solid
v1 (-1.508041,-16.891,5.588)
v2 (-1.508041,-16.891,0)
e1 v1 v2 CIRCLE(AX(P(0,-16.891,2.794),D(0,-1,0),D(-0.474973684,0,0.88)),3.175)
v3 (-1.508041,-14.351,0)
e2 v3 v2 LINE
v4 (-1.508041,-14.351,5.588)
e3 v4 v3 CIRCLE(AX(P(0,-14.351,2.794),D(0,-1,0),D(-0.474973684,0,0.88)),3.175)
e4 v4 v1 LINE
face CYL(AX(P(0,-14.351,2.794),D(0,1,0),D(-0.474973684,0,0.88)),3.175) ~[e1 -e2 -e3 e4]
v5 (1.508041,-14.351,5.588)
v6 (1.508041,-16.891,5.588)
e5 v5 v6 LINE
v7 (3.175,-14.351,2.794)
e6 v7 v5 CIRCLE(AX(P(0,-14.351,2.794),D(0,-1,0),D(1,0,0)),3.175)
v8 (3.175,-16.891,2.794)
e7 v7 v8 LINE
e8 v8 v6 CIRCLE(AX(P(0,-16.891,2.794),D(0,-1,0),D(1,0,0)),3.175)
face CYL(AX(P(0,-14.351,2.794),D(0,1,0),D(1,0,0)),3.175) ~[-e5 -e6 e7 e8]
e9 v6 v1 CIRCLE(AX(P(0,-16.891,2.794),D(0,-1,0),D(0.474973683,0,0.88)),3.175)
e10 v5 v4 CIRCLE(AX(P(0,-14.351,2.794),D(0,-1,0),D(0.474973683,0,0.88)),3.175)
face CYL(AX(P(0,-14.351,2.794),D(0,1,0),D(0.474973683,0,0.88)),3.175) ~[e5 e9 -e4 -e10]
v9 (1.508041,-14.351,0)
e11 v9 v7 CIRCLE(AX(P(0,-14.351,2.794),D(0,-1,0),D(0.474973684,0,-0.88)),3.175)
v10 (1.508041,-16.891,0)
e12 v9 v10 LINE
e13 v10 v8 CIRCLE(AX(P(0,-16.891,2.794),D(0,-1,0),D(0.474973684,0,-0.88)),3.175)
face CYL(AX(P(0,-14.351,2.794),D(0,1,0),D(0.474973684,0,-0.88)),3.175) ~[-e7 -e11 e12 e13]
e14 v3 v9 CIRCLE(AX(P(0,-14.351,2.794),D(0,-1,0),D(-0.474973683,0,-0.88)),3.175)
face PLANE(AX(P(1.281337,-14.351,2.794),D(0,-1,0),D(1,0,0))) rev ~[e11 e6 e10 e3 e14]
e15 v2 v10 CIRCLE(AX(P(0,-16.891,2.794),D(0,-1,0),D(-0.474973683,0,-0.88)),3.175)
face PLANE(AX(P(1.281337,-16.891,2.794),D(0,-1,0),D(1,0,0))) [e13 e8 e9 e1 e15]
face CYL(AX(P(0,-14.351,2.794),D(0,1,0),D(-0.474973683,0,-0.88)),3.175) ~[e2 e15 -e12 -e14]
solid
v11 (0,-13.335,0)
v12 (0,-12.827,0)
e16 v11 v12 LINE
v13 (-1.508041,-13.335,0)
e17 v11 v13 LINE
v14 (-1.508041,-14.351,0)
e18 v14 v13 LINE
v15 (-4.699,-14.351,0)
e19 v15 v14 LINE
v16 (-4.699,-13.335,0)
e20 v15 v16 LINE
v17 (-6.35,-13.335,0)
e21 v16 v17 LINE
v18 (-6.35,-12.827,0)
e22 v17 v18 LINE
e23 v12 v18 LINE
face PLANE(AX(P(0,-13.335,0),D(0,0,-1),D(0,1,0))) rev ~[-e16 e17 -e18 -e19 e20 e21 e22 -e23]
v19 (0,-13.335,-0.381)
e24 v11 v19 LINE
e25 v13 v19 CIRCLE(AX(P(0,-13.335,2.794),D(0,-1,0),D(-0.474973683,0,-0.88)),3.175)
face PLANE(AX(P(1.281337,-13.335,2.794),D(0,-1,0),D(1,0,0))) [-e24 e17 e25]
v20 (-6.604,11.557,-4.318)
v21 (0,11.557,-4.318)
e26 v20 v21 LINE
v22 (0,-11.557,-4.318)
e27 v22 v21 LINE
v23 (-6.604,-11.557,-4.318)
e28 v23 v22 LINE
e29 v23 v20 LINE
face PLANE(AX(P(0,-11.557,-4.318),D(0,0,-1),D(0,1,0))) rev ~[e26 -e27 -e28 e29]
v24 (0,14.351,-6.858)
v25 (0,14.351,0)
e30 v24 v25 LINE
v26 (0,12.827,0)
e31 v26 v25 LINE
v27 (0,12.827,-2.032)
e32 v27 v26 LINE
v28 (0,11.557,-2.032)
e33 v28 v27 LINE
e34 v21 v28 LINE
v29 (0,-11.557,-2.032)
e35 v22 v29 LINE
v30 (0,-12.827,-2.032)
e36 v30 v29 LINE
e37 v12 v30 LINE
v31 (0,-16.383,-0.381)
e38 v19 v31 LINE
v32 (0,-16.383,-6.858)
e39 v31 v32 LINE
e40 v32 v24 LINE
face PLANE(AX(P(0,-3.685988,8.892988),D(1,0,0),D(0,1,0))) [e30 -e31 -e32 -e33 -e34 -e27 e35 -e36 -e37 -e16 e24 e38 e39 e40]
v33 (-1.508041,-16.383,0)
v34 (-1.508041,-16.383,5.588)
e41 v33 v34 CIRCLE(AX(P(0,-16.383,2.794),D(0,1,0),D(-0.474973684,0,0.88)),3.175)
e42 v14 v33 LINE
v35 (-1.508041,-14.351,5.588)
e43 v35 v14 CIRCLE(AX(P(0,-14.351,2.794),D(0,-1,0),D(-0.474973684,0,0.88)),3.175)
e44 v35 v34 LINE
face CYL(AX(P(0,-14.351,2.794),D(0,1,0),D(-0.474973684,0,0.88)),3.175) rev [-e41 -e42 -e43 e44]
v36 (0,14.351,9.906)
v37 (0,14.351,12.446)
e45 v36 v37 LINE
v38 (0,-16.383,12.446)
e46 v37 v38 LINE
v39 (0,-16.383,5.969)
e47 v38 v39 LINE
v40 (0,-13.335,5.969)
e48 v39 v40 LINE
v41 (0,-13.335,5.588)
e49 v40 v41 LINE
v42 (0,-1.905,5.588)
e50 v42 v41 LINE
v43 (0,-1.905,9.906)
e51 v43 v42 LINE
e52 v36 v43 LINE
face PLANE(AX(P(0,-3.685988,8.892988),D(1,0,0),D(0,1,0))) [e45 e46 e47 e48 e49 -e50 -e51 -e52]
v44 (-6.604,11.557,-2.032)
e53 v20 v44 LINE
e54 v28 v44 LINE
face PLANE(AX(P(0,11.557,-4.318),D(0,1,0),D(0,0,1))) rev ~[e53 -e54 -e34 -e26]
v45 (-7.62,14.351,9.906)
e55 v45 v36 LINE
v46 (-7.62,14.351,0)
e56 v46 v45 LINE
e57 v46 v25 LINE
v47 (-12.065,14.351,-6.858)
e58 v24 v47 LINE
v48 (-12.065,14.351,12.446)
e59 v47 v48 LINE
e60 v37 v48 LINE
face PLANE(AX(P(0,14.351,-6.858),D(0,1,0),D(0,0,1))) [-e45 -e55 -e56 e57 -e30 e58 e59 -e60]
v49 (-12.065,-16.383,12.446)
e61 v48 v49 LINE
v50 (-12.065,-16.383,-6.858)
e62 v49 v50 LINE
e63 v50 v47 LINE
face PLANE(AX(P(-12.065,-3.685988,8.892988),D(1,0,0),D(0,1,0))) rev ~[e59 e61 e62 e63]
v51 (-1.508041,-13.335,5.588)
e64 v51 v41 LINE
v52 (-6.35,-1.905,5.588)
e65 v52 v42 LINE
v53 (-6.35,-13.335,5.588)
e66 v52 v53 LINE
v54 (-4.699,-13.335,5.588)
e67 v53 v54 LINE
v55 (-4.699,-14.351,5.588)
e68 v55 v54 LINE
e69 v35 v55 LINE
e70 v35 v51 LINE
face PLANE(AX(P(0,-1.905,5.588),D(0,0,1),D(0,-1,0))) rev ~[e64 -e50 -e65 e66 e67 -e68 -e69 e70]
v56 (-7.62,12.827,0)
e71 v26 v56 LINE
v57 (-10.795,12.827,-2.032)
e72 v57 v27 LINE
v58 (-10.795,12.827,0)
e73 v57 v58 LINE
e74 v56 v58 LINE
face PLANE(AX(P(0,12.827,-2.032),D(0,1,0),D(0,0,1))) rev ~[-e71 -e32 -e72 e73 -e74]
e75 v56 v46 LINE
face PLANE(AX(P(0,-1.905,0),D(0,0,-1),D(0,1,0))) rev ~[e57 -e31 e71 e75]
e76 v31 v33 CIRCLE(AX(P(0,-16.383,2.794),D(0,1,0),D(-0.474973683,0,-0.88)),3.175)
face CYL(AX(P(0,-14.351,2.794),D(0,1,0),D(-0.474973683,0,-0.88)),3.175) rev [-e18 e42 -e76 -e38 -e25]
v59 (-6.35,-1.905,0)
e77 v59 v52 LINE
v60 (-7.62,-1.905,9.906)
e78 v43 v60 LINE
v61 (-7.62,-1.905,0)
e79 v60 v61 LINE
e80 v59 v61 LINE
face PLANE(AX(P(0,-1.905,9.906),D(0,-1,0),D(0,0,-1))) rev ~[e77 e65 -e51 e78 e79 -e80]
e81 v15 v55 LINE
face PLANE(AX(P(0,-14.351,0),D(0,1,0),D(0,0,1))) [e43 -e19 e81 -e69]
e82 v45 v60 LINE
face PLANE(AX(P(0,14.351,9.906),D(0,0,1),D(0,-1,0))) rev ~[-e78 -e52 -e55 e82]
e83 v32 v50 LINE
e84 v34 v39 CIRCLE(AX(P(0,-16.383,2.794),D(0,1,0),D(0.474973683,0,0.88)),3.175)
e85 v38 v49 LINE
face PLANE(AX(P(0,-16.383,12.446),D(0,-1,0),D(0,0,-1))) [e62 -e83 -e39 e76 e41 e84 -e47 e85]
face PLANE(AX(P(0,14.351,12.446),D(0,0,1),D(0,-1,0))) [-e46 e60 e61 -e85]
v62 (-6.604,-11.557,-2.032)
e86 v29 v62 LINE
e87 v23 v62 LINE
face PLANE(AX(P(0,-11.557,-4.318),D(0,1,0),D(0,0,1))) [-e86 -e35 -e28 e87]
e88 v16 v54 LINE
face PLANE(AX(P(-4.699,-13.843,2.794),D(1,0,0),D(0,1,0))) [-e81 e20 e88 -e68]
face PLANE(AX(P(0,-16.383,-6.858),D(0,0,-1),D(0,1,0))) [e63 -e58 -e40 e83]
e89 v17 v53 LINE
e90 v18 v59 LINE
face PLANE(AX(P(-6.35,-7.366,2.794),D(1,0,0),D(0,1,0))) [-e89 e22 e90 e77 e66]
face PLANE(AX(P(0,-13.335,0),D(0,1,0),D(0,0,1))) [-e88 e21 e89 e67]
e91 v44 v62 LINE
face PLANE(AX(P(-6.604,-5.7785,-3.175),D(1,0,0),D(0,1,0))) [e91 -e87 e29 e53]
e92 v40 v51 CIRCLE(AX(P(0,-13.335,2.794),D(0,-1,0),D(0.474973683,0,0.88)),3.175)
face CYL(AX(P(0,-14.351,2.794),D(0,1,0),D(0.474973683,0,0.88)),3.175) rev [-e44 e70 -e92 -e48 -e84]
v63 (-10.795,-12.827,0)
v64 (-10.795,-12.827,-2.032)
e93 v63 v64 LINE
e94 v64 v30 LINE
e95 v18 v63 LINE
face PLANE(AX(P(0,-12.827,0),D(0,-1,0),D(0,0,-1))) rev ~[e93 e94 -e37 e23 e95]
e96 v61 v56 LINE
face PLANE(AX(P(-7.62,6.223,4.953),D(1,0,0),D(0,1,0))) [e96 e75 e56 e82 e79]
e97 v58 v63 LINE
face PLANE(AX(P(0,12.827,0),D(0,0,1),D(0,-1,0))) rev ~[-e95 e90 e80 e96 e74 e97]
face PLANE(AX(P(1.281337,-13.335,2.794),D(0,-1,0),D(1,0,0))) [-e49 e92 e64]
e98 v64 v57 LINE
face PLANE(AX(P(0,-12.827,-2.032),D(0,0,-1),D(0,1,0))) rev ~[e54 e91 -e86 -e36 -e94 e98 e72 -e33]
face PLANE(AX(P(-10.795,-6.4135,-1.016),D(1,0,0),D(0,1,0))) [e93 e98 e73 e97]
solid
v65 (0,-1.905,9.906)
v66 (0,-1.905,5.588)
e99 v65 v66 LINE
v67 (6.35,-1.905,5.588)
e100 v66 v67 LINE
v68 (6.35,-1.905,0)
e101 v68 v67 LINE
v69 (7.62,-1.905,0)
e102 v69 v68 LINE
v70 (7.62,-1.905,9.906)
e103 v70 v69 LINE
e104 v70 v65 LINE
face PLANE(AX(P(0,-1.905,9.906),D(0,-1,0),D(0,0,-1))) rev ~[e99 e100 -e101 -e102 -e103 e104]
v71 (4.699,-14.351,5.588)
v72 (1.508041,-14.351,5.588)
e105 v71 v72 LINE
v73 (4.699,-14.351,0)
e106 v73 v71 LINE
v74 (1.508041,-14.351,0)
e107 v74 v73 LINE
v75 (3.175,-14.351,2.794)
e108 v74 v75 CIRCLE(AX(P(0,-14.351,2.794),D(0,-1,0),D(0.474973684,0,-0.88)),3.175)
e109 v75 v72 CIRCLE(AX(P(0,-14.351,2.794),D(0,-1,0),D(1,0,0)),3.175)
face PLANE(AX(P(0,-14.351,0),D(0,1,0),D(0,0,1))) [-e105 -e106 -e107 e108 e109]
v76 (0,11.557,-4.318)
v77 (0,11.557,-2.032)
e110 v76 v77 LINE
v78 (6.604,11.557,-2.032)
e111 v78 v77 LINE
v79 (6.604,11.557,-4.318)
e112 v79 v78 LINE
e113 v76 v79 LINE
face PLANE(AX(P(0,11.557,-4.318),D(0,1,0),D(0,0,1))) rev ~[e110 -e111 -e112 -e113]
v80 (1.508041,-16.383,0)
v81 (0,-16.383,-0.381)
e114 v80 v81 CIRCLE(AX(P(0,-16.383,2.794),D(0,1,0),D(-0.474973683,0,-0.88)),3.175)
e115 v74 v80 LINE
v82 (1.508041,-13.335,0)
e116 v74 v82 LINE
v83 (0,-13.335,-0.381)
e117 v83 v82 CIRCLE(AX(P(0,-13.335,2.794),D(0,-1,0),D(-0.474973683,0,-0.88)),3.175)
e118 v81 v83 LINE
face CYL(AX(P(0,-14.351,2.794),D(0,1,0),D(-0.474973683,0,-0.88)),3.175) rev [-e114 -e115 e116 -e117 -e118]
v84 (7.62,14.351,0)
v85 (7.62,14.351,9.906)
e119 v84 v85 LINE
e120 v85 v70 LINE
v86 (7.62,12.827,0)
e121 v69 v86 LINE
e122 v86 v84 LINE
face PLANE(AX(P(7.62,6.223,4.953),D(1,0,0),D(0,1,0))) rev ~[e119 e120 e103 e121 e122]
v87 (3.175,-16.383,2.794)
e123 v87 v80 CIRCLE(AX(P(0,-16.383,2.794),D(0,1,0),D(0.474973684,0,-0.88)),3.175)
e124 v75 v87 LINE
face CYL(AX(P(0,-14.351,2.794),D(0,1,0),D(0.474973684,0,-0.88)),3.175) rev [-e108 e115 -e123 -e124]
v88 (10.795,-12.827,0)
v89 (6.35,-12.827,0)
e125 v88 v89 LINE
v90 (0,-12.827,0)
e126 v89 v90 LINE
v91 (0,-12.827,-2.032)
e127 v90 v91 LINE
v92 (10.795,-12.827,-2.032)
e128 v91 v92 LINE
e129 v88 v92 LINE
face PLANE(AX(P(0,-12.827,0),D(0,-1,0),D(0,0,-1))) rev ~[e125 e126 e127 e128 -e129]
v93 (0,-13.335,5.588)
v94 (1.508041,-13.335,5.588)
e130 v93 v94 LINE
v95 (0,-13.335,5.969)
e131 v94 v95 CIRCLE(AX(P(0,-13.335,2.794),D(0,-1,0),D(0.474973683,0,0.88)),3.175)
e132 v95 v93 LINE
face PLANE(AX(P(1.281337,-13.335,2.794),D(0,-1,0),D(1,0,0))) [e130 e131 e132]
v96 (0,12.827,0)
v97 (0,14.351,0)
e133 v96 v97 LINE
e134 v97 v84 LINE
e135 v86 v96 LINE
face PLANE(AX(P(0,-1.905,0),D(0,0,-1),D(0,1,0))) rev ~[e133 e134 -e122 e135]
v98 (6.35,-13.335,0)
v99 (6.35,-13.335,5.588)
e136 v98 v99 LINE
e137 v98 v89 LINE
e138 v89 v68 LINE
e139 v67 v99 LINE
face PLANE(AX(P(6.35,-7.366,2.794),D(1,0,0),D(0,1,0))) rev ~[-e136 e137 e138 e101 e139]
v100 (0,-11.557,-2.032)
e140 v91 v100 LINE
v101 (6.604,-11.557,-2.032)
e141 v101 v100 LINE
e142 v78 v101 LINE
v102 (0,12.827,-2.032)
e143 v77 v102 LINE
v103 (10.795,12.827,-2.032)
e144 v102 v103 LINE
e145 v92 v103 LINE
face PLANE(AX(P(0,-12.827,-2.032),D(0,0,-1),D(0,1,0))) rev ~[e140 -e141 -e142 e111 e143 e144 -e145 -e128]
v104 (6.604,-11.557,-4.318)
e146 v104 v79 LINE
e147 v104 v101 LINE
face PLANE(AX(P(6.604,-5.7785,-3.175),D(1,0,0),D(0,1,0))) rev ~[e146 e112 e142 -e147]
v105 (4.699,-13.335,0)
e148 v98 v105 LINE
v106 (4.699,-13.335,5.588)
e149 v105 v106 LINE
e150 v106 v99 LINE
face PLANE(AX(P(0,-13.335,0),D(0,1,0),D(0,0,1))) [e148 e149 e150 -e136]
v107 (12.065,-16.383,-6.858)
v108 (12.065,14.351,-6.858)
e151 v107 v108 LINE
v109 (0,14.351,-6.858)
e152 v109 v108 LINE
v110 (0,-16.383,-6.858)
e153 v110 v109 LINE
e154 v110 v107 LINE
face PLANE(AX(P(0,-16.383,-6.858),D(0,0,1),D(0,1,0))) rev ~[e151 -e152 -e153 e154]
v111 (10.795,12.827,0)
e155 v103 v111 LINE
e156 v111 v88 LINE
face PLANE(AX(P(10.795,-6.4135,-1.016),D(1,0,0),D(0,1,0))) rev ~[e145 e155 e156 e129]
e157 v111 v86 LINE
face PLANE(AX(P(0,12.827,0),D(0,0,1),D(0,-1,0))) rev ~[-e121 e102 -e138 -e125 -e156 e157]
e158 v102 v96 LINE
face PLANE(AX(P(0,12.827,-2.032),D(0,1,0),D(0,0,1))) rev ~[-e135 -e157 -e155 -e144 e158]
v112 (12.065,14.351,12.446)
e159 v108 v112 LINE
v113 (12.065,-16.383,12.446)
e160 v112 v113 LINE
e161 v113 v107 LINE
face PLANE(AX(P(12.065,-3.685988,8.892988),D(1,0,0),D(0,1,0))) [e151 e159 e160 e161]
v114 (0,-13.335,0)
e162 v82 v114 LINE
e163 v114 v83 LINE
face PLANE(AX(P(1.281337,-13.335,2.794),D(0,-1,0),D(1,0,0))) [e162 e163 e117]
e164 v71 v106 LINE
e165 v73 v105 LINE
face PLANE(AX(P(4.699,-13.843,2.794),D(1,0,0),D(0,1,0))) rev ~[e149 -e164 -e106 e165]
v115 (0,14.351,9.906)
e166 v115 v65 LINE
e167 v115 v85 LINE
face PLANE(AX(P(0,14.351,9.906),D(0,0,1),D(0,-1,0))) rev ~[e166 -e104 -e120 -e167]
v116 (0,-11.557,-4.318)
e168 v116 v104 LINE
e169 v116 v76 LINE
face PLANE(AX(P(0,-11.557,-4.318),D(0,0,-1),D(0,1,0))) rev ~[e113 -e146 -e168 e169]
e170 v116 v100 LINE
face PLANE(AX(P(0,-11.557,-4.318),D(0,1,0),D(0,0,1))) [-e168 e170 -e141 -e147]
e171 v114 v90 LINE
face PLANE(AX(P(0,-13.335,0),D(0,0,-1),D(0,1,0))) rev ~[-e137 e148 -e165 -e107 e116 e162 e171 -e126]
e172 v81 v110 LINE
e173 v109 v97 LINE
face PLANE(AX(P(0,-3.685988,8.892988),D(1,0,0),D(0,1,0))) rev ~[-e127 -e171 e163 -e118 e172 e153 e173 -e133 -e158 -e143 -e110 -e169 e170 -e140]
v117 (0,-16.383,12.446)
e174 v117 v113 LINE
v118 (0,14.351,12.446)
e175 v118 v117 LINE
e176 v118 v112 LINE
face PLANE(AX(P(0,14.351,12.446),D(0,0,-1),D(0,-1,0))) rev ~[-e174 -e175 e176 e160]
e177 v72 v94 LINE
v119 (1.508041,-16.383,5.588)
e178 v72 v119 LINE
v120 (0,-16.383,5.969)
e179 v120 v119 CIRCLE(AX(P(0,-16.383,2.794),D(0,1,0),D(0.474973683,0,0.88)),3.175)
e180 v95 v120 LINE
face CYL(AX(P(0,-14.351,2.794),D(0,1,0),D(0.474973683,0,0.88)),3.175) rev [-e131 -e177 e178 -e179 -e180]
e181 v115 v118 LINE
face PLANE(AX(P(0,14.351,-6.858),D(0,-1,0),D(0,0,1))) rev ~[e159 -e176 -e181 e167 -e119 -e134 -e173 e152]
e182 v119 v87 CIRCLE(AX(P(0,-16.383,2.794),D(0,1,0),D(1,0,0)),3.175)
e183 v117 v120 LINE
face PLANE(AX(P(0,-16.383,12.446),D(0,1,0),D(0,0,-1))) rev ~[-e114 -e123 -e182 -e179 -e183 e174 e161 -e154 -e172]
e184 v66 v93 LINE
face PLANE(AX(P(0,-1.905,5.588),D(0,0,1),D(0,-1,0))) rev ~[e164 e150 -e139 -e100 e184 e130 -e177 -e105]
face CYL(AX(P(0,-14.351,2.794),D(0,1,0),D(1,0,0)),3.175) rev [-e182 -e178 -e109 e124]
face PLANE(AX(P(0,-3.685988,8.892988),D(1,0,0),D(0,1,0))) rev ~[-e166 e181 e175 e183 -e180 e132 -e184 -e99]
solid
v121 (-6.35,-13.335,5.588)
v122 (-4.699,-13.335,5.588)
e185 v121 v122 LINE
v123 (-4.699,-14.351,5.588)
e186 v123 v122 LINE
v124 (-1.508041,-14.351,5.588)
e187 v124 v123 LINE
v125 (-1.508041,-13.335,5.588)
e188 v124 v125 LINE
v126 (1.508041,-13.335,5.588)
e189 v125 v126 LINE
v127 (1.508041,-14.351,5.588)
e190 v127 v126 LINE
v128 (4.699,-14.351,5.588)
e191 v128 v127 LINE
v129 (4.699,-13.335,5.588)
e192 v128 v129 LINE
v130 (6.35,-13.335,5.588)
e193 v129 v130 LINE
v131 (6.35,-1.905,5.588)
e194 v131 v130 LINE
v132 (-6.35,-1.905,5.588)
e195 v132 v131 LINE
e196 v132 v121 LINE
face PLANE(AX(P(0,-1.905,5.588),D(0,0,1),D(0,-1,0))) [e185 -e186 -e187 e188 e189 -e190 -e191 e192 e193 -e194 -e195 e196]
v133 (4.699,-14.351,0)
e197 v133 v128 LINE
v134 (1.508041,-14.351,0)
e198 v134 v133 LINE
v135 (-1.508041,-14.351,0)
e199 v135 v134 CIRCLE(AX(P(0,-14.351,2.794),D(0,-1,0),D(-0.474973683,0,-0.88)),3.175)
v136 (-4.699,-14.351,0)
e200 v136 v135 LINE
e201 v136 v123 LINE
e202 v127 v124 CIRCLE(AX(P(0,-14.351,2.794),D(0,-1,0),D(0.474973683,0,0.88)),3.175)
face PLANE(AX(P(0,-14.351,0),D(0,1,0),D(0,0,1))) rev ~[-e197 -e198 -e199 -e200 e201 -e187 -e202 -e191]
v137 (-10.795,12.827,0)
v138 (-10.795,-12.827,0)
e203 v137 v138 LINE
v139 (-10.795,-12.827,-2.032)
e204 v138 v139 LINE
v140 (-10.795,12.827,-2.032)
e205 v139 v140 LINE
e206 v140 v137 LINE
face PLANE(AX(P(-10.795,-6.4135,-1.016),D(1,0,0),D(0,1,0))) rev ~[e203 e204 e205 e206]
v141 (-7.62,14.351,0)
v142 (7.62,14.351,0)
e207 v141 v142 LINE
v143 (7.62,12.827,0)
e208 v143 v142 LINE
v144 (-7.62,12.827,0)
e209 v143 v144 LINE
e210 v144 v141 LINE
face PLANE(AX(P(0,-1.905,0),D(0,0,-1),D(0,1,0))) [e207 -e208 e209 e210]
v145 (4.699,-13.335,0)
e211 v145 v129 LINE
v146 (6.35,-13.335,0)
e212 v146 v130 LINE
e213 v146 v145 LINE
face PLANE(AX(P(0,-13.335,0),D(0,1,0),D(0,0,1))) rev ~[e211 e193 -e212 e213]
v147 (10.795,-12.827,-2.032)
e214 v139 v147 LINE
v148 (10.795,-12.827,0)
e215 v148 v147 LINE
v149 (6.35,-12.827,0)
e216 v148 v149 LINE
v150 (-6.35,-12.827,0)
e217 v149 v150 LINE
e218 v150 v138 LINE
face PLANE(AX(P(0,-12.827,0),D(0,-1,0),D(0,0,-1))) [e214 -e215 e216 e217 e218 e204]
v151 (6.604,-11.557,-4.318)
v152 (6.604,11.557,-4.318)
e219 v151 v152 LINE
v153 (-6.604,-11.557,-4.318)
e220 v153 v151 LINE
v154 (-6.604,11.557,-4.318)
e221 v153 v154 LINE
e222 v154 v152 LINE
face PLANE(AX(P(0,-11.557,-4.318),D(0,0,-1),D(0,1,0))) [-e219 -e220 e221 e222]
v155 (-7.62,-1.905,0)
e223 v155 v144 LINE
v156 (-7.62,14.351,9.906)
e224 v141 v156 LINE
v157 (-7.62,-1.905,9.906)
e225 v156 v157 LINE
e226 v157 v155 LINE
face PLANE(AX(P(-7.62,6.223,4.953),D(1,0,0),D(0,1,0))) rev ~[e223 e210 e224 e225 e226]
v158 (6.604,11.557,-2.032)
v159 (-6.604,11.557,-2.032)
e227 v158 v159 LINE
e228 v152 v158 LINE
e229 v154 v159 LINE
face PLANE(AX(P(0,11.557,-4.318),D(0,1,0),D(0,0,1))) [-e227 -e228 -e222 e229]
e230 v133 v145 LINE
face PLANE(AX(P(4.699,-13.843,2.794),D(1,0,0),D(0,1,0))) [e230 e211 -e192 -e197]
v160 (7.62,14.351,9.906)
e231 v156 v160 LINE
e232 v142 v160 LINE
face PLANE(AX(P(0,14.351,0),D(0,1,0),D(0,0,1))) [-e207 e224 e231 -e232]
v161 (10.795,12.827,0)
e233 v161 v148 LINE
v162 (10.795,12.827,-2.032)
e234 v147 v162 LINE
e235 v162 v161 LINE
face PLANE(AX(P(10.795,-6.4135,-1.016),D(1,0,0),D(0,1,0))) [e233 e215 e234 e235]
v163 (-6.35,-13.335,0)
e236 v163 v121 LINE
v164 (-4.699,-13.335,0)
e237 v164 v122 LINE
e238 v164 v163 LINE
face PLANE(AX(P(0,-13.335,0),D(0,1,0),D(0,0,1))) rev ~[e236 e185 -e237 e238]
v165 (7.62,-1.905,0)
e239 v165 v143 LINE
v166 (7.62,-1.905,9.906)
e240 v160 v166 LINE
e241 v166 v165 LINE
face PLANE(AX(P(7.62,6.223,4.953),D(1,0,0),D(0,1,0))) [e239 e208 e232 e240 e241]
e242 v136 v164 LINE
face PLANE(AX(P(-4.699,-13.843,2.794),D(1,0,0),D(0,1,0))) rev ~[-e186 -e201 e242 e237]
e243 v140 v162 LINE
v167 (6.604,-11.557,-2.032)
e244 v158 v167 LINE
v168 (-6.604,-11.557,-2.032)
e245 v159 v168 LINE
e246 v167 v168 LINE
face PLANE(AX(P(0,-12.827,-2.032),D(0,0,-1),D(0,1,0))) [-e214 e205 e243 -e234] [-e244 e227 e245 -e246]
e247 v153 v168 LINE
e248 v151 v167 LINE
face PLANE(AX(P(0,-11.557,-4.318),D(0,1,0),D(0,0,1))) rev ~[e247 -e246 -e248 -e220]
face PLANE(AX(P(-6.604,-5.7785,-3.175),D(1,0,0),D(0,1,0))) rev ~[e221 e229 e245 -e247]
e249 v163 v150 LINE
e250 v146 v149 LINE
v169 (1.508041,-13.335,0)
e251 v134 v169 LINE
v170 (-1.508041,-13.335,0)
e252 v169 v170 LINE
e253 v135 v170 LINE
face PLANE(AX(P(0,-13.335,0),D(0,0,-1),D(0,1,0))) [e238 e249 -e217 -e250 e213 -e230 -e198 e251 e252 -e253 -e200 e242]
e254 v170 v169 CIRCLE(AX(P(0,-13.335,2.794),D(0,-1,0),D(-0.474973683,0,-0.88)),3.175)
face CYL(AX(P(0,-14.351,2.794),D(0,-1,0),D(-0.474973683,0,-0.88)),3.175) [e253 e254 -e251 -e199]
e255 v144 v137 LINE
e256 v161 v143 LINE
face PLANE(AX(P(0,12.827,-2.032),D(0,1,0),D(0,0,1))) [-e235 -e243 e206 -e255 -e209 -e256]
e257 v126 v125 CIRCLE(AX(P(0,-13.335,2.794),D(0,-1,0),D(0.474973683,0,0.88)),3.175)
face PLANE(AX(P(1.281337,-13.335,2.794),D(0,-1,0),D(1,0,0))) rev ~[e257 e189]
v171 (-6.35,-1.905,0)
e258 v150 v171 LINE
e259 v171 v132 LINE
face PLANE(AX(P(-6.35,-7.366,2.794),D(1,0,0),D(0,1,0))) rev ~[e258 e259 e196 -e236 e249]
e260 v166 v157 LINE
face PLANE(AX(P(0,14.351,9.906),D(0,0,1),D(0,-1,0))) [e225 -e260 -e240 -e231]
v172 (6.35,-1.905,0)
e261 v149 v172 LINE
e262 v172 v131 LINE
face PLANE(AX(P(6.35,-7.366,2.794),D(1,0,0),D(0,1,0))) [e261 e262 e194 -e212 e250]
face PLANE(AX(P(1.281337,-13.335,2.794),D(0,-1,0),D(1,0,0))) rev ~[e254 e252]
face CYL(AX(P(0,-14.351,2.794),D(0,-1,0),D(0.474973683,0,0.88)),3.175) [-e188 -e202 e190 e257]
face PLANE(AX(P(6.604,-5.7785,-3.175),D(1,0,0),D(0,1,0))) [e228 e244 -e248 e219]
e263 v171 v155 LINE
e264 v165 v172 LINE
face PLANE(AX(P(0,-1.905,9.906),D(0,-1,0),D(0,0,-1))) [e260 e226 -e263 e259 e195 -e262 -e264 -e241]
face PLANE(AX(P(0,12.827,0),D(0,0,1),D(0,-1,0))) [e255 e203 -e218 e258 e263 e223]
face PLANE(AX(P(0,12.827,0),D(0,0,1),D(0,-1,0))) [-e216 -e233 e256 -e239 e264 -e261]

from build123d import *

# Parameters (mm, degrees)
F1_DEPTH  = 10.795
F0_W      = 11.557
F0_H      = 2.286
F2_DEPTH  = 6.604
F3_DEPTH  = 7.62
F0_W_2    = 10.922
F0_H_2    = 5.588
F0_W_3    = 0.508
F4_DEPTH  = 6.35
F0_W_4    = 1.016
F5_DEPTH  = 4.699
F7_DEPTH  = 2.54
F8_DEPTH  = 1.016
F9_DEPTH  = 12.065
F10_DEPTH = 12.065


with BuildPart() as f1:
    # F0 (on Right) → F1 (new body, symmetric)
    with BuildSketch(Plane.YZ):
        Polygon((0, -2.032), (0, 0), (-1.905, 0), (-12.827, 0), (-12.827, -2.032), (-11.557, -2.032), align=None)
        Polygon((12.827, 0), (0, 0), (0, -2.032), (11.557, -2.032), (12.827, -2.032), align=None)
    extrude(amount=F1_DEPTH, both=True)

    # F0 (on Right) → F2 (join, symmetric)
    with BuildSketch(Plane.YZ):
        with Locations((-5.7785, -3.175)):
            Rectangle(F0_W, F0_H)
        with Locations((5.7785, -3.175)):
            Rectangle(F0_W, F0_H)
    extrude(amount=F2_DEPTH, both=True)

    # F0 (on Right) → F3 (join, symmetric)
    with BuildSketch(Plane.YZ):
        Polygon((-1.905, 0), (0, 0), (12.827, 0), (14.351, 0), (14.351, 9.906), (-1.905, 9.906), (-1.905, 5.588), align=None)
    extrude(amount=F3_DEPTH, both=True)

    # F0 (on Right) → F4 (join, symmetric)
    with BuildSketch(Plane.YZ):
        with Locations((-7.366, 2.794)):
            Rectangle(F0_W_2, F0_H_2)
        with Locations((-13.081, 2.794)):
            Rectangle(F0_W_3, F0_H_2)
    extrude(amount=F4_DEPTH, both=True)

    # F0 (on Right) → F5 (join, symmetric)
    with BuildSketch(Plane.YZ):
        with Locations((-13.843, 2.794)):
            Rectangle(F0_W_4, F0_H_2)
    extrude(amount=F5_DEPTH, both=True)

    # F6 (on face) → F8 (join)
    with BuildSketch(Plane.XZ.offset(14.351)):
        with BuildLine():
            Line((1.5080414451, 5.588), (0, 5.588))
            Line((0, 5.588), (0, 0))
            Line((0, 0), (1.5080414451, 0))
            ThreePointArc((1.5080414451, 0), (2.726596467, 1.1672557958), (3.175, 2.794))
            ThreePointArc((3.175, 2.794), (2.726596467, 4.4207442042), (1.5080414451, 5.588))
        make_face()
        with BuildLine():
            Line((-1.5080414451, 5.588), (0, 5.588))
            Line((0, 5.588), (1.5080414451, 5.588))
            ThreePointArc((1.5080414451, 5.588), (0, 5.969), (-1.5080414451, 5.588))
        make_face()
        with BuildLine():
            Line((1.5080414451, 0), (0, 0))
            Line((0, 0), (-1.5080414451, 0))
            ThreePointArc((-1.5080414451, 0), (0, -0.381), (1.5080414451, 0))
        make_face()
    extrude(amount=-F8_DEPTH)


with BuildPart() as f7:
    # F6 (on face) → F7 (new body)
    with BuildSketch(Plane.XZ.offset(14.351)):
        with BuildLine():
            Line((1.5080414451, 5.588), (0, 5.588))
            Line((0, 5.588), (0, 0))
            Line((0, 0), (1.5080414451, 0))
            ThreePointArc((1.5080414451, 0), (2.726596467, 1.1672557958), (3.175, 2.794))
            ThreePointArc((3.175, 2.794), (2.726596467, 4.4207442042), (1.5080414451, 5.588))
        make_face()
        with BuildLine():
            Line((-1.5080414451, 5.588), (0, 5.588))
            Line((0, 5.588), (1.5080414451, 5.588))
            ThreePointArc((1.5080414451, 5.588), (0, 5.969), (-1.5080414451, 5.588))
        make_face()
        with BuildLine():
            Line((0, 0), (0, 5.588))
            Line((0, 5.588), (-1.5080414451, 5.588))
            ThreePointArc((-1.5080414451, 5.588), (-3.175, 2.794), (-1.5080414451, 0))
            Line((-1.5080414451, 0), (0, 0))
        make_face()
        with BuildLine():
            Line((1.5080414451, 0), (0, 0))
            Line((0, 0), (-1.5080414451, 0))
            ThreePointArc((-1.5080414451, 0), (0, -0.381), (1.5080414451, 0))
        make_face()
    extrude(amount=F7_DEPTH)


with BuildPart() as f9:
    # F0 (on Right) → F9 (new body)
    with BuildSketch(Plane.YZ):
        Polygon((-12.827, 5.588), (-1.905, 5.588), (-1.905, 9.906), (14.351, 9.906), (14.351, 12.446), (-16.383, 12.446), (-16.383, 0), (-14.351, 0), (-14.351, 5.588), (-13.335, 5.588), align=None)
        Polygon((-12.827, -2.032), (-12.827, 0), (-13.335, 0), (-14.351, 0), (-16.383, 0), (-16.383, -6.858), (-11.557, -6.858), (-11.557, -4.318), (-11.557, -2.032), align=None)
        Polygon((14.351, 0), (12.827, 0), (12.827, -2.032), (11.557, -2.032), (11.557, -4.318), (0, -4.318), (-11.557, -4.318), (-11.557, -6.858), (14.351, -6.858), align=None)
        with Locations((-13.843, 2.794)):
            Rectangle(F0_W_4, F0_H_2)
        with Locations((-7.366, 2.794)):
            Rectangle(F0_W_2, F0_H_2)
        with Locations((-13.081, 2.794)):
            Rectangle(F0_W_3, F0_H_2)
        Polygon((0, -2.032), (0, 0), (-1.905, 0), (-12.827, 0), (-12.827, -2.032), (-11.557, -2.032), align=None)
        with Locations((-5.7785, -3.175)):
            Rectangle(F0_W, F0_H)
        with Locations((5.7785, -3.175)):
            Rectangle(F0_W, F0_H)
        Polygon((12.827, 0), (0, 0), (0, -2.032), (11.557, -2.032), (12.827, -2.032), align=None)
        Polygon((-1.905, 0), (0, 0), (12.827, 0), (14.351, 0), (14.351, 9.906), (-1.905, 9.906), (-1.905, 5.588), align=None)
    extrude(amount=F9_DEPTH)

    # F11: cut F1, F7
    add(f1.part, mode=Mode.SUBTRACT)
    add(f7.part, mode=Mode.SUBTRACT)


with BuildPart() as f10:
    # F0 (on Right) → F10 (new body)
    with BuildSketch(Plane.YZ):
        Polygon((-12.827, 5.588), (-1.905, 5.588), (-1.905, 9.906), (14.351, 9.906), (14.351, 12.446), (-16.383, 12.446), (-16.383, 0), (-14.351, 0), (-14.351, 5.588), (-13.335, 5.588), align=None)
        Polygon((-1.905, 0), (0, 0), (12.827, 0), (14.351, 0), (14.351, 9.906), (-1.905, 9.906), (-1.905, 5.588), align=None)
        with Locations((-7.366, 2.794)):
            Rectangle(F0_W_2, F0_H_2)
        with Locations((-13.081, 2.794)):
            Rectangle(F0_W_3, F0_H_2)
        with Locations((-13.843, 2.794)):
            Rectangle(F0_W_4, F0_H_2)
        Polygon((-12.827, -2.032), (-12.827, 0), (-13.335, 0), (-14.351, 0), (-16.383, 0), (-16.383, -6.858), (-11.557, -6.858), (-11.557, -4.318), (-11.557, -2.032), align=None)
        Polygon((0, -2.032), (0, 0), (-1.905, 0), (-12.827, 0), (-12.827, -2.032), (-11.557, -2.032), align=None)
        with Locations((-5.7785, -3.175)):
            Rectangle(F0_W, F0_H)
        Polygon((14.351, 0), (12.827, 0), (12.827, -2.032), (11.557, -2.032), (11.557, -4.318), (0, -4.318), (-11.557, -4.318), (-11.557, -6.858), (14.351, -6.858), align=None)
        with Locations((5.7785, -3.175)):
            Rectangle(F0_W, F0_H)
        Polygon((12.827, 0), (0, 0), (0, -2.032), (11.557, -2.032), (12.827, -2.032), align=None)
    extrude(amount=-F10_DEPTH)

    # F11: cut F1, F7
    add(f1.part, mode=Mode.SUBTRACT)
    add(f7.part, mode=Mode.SUBTRACT)


solid = Compound([f1.part, f7.part, f9.part, f10.part])
